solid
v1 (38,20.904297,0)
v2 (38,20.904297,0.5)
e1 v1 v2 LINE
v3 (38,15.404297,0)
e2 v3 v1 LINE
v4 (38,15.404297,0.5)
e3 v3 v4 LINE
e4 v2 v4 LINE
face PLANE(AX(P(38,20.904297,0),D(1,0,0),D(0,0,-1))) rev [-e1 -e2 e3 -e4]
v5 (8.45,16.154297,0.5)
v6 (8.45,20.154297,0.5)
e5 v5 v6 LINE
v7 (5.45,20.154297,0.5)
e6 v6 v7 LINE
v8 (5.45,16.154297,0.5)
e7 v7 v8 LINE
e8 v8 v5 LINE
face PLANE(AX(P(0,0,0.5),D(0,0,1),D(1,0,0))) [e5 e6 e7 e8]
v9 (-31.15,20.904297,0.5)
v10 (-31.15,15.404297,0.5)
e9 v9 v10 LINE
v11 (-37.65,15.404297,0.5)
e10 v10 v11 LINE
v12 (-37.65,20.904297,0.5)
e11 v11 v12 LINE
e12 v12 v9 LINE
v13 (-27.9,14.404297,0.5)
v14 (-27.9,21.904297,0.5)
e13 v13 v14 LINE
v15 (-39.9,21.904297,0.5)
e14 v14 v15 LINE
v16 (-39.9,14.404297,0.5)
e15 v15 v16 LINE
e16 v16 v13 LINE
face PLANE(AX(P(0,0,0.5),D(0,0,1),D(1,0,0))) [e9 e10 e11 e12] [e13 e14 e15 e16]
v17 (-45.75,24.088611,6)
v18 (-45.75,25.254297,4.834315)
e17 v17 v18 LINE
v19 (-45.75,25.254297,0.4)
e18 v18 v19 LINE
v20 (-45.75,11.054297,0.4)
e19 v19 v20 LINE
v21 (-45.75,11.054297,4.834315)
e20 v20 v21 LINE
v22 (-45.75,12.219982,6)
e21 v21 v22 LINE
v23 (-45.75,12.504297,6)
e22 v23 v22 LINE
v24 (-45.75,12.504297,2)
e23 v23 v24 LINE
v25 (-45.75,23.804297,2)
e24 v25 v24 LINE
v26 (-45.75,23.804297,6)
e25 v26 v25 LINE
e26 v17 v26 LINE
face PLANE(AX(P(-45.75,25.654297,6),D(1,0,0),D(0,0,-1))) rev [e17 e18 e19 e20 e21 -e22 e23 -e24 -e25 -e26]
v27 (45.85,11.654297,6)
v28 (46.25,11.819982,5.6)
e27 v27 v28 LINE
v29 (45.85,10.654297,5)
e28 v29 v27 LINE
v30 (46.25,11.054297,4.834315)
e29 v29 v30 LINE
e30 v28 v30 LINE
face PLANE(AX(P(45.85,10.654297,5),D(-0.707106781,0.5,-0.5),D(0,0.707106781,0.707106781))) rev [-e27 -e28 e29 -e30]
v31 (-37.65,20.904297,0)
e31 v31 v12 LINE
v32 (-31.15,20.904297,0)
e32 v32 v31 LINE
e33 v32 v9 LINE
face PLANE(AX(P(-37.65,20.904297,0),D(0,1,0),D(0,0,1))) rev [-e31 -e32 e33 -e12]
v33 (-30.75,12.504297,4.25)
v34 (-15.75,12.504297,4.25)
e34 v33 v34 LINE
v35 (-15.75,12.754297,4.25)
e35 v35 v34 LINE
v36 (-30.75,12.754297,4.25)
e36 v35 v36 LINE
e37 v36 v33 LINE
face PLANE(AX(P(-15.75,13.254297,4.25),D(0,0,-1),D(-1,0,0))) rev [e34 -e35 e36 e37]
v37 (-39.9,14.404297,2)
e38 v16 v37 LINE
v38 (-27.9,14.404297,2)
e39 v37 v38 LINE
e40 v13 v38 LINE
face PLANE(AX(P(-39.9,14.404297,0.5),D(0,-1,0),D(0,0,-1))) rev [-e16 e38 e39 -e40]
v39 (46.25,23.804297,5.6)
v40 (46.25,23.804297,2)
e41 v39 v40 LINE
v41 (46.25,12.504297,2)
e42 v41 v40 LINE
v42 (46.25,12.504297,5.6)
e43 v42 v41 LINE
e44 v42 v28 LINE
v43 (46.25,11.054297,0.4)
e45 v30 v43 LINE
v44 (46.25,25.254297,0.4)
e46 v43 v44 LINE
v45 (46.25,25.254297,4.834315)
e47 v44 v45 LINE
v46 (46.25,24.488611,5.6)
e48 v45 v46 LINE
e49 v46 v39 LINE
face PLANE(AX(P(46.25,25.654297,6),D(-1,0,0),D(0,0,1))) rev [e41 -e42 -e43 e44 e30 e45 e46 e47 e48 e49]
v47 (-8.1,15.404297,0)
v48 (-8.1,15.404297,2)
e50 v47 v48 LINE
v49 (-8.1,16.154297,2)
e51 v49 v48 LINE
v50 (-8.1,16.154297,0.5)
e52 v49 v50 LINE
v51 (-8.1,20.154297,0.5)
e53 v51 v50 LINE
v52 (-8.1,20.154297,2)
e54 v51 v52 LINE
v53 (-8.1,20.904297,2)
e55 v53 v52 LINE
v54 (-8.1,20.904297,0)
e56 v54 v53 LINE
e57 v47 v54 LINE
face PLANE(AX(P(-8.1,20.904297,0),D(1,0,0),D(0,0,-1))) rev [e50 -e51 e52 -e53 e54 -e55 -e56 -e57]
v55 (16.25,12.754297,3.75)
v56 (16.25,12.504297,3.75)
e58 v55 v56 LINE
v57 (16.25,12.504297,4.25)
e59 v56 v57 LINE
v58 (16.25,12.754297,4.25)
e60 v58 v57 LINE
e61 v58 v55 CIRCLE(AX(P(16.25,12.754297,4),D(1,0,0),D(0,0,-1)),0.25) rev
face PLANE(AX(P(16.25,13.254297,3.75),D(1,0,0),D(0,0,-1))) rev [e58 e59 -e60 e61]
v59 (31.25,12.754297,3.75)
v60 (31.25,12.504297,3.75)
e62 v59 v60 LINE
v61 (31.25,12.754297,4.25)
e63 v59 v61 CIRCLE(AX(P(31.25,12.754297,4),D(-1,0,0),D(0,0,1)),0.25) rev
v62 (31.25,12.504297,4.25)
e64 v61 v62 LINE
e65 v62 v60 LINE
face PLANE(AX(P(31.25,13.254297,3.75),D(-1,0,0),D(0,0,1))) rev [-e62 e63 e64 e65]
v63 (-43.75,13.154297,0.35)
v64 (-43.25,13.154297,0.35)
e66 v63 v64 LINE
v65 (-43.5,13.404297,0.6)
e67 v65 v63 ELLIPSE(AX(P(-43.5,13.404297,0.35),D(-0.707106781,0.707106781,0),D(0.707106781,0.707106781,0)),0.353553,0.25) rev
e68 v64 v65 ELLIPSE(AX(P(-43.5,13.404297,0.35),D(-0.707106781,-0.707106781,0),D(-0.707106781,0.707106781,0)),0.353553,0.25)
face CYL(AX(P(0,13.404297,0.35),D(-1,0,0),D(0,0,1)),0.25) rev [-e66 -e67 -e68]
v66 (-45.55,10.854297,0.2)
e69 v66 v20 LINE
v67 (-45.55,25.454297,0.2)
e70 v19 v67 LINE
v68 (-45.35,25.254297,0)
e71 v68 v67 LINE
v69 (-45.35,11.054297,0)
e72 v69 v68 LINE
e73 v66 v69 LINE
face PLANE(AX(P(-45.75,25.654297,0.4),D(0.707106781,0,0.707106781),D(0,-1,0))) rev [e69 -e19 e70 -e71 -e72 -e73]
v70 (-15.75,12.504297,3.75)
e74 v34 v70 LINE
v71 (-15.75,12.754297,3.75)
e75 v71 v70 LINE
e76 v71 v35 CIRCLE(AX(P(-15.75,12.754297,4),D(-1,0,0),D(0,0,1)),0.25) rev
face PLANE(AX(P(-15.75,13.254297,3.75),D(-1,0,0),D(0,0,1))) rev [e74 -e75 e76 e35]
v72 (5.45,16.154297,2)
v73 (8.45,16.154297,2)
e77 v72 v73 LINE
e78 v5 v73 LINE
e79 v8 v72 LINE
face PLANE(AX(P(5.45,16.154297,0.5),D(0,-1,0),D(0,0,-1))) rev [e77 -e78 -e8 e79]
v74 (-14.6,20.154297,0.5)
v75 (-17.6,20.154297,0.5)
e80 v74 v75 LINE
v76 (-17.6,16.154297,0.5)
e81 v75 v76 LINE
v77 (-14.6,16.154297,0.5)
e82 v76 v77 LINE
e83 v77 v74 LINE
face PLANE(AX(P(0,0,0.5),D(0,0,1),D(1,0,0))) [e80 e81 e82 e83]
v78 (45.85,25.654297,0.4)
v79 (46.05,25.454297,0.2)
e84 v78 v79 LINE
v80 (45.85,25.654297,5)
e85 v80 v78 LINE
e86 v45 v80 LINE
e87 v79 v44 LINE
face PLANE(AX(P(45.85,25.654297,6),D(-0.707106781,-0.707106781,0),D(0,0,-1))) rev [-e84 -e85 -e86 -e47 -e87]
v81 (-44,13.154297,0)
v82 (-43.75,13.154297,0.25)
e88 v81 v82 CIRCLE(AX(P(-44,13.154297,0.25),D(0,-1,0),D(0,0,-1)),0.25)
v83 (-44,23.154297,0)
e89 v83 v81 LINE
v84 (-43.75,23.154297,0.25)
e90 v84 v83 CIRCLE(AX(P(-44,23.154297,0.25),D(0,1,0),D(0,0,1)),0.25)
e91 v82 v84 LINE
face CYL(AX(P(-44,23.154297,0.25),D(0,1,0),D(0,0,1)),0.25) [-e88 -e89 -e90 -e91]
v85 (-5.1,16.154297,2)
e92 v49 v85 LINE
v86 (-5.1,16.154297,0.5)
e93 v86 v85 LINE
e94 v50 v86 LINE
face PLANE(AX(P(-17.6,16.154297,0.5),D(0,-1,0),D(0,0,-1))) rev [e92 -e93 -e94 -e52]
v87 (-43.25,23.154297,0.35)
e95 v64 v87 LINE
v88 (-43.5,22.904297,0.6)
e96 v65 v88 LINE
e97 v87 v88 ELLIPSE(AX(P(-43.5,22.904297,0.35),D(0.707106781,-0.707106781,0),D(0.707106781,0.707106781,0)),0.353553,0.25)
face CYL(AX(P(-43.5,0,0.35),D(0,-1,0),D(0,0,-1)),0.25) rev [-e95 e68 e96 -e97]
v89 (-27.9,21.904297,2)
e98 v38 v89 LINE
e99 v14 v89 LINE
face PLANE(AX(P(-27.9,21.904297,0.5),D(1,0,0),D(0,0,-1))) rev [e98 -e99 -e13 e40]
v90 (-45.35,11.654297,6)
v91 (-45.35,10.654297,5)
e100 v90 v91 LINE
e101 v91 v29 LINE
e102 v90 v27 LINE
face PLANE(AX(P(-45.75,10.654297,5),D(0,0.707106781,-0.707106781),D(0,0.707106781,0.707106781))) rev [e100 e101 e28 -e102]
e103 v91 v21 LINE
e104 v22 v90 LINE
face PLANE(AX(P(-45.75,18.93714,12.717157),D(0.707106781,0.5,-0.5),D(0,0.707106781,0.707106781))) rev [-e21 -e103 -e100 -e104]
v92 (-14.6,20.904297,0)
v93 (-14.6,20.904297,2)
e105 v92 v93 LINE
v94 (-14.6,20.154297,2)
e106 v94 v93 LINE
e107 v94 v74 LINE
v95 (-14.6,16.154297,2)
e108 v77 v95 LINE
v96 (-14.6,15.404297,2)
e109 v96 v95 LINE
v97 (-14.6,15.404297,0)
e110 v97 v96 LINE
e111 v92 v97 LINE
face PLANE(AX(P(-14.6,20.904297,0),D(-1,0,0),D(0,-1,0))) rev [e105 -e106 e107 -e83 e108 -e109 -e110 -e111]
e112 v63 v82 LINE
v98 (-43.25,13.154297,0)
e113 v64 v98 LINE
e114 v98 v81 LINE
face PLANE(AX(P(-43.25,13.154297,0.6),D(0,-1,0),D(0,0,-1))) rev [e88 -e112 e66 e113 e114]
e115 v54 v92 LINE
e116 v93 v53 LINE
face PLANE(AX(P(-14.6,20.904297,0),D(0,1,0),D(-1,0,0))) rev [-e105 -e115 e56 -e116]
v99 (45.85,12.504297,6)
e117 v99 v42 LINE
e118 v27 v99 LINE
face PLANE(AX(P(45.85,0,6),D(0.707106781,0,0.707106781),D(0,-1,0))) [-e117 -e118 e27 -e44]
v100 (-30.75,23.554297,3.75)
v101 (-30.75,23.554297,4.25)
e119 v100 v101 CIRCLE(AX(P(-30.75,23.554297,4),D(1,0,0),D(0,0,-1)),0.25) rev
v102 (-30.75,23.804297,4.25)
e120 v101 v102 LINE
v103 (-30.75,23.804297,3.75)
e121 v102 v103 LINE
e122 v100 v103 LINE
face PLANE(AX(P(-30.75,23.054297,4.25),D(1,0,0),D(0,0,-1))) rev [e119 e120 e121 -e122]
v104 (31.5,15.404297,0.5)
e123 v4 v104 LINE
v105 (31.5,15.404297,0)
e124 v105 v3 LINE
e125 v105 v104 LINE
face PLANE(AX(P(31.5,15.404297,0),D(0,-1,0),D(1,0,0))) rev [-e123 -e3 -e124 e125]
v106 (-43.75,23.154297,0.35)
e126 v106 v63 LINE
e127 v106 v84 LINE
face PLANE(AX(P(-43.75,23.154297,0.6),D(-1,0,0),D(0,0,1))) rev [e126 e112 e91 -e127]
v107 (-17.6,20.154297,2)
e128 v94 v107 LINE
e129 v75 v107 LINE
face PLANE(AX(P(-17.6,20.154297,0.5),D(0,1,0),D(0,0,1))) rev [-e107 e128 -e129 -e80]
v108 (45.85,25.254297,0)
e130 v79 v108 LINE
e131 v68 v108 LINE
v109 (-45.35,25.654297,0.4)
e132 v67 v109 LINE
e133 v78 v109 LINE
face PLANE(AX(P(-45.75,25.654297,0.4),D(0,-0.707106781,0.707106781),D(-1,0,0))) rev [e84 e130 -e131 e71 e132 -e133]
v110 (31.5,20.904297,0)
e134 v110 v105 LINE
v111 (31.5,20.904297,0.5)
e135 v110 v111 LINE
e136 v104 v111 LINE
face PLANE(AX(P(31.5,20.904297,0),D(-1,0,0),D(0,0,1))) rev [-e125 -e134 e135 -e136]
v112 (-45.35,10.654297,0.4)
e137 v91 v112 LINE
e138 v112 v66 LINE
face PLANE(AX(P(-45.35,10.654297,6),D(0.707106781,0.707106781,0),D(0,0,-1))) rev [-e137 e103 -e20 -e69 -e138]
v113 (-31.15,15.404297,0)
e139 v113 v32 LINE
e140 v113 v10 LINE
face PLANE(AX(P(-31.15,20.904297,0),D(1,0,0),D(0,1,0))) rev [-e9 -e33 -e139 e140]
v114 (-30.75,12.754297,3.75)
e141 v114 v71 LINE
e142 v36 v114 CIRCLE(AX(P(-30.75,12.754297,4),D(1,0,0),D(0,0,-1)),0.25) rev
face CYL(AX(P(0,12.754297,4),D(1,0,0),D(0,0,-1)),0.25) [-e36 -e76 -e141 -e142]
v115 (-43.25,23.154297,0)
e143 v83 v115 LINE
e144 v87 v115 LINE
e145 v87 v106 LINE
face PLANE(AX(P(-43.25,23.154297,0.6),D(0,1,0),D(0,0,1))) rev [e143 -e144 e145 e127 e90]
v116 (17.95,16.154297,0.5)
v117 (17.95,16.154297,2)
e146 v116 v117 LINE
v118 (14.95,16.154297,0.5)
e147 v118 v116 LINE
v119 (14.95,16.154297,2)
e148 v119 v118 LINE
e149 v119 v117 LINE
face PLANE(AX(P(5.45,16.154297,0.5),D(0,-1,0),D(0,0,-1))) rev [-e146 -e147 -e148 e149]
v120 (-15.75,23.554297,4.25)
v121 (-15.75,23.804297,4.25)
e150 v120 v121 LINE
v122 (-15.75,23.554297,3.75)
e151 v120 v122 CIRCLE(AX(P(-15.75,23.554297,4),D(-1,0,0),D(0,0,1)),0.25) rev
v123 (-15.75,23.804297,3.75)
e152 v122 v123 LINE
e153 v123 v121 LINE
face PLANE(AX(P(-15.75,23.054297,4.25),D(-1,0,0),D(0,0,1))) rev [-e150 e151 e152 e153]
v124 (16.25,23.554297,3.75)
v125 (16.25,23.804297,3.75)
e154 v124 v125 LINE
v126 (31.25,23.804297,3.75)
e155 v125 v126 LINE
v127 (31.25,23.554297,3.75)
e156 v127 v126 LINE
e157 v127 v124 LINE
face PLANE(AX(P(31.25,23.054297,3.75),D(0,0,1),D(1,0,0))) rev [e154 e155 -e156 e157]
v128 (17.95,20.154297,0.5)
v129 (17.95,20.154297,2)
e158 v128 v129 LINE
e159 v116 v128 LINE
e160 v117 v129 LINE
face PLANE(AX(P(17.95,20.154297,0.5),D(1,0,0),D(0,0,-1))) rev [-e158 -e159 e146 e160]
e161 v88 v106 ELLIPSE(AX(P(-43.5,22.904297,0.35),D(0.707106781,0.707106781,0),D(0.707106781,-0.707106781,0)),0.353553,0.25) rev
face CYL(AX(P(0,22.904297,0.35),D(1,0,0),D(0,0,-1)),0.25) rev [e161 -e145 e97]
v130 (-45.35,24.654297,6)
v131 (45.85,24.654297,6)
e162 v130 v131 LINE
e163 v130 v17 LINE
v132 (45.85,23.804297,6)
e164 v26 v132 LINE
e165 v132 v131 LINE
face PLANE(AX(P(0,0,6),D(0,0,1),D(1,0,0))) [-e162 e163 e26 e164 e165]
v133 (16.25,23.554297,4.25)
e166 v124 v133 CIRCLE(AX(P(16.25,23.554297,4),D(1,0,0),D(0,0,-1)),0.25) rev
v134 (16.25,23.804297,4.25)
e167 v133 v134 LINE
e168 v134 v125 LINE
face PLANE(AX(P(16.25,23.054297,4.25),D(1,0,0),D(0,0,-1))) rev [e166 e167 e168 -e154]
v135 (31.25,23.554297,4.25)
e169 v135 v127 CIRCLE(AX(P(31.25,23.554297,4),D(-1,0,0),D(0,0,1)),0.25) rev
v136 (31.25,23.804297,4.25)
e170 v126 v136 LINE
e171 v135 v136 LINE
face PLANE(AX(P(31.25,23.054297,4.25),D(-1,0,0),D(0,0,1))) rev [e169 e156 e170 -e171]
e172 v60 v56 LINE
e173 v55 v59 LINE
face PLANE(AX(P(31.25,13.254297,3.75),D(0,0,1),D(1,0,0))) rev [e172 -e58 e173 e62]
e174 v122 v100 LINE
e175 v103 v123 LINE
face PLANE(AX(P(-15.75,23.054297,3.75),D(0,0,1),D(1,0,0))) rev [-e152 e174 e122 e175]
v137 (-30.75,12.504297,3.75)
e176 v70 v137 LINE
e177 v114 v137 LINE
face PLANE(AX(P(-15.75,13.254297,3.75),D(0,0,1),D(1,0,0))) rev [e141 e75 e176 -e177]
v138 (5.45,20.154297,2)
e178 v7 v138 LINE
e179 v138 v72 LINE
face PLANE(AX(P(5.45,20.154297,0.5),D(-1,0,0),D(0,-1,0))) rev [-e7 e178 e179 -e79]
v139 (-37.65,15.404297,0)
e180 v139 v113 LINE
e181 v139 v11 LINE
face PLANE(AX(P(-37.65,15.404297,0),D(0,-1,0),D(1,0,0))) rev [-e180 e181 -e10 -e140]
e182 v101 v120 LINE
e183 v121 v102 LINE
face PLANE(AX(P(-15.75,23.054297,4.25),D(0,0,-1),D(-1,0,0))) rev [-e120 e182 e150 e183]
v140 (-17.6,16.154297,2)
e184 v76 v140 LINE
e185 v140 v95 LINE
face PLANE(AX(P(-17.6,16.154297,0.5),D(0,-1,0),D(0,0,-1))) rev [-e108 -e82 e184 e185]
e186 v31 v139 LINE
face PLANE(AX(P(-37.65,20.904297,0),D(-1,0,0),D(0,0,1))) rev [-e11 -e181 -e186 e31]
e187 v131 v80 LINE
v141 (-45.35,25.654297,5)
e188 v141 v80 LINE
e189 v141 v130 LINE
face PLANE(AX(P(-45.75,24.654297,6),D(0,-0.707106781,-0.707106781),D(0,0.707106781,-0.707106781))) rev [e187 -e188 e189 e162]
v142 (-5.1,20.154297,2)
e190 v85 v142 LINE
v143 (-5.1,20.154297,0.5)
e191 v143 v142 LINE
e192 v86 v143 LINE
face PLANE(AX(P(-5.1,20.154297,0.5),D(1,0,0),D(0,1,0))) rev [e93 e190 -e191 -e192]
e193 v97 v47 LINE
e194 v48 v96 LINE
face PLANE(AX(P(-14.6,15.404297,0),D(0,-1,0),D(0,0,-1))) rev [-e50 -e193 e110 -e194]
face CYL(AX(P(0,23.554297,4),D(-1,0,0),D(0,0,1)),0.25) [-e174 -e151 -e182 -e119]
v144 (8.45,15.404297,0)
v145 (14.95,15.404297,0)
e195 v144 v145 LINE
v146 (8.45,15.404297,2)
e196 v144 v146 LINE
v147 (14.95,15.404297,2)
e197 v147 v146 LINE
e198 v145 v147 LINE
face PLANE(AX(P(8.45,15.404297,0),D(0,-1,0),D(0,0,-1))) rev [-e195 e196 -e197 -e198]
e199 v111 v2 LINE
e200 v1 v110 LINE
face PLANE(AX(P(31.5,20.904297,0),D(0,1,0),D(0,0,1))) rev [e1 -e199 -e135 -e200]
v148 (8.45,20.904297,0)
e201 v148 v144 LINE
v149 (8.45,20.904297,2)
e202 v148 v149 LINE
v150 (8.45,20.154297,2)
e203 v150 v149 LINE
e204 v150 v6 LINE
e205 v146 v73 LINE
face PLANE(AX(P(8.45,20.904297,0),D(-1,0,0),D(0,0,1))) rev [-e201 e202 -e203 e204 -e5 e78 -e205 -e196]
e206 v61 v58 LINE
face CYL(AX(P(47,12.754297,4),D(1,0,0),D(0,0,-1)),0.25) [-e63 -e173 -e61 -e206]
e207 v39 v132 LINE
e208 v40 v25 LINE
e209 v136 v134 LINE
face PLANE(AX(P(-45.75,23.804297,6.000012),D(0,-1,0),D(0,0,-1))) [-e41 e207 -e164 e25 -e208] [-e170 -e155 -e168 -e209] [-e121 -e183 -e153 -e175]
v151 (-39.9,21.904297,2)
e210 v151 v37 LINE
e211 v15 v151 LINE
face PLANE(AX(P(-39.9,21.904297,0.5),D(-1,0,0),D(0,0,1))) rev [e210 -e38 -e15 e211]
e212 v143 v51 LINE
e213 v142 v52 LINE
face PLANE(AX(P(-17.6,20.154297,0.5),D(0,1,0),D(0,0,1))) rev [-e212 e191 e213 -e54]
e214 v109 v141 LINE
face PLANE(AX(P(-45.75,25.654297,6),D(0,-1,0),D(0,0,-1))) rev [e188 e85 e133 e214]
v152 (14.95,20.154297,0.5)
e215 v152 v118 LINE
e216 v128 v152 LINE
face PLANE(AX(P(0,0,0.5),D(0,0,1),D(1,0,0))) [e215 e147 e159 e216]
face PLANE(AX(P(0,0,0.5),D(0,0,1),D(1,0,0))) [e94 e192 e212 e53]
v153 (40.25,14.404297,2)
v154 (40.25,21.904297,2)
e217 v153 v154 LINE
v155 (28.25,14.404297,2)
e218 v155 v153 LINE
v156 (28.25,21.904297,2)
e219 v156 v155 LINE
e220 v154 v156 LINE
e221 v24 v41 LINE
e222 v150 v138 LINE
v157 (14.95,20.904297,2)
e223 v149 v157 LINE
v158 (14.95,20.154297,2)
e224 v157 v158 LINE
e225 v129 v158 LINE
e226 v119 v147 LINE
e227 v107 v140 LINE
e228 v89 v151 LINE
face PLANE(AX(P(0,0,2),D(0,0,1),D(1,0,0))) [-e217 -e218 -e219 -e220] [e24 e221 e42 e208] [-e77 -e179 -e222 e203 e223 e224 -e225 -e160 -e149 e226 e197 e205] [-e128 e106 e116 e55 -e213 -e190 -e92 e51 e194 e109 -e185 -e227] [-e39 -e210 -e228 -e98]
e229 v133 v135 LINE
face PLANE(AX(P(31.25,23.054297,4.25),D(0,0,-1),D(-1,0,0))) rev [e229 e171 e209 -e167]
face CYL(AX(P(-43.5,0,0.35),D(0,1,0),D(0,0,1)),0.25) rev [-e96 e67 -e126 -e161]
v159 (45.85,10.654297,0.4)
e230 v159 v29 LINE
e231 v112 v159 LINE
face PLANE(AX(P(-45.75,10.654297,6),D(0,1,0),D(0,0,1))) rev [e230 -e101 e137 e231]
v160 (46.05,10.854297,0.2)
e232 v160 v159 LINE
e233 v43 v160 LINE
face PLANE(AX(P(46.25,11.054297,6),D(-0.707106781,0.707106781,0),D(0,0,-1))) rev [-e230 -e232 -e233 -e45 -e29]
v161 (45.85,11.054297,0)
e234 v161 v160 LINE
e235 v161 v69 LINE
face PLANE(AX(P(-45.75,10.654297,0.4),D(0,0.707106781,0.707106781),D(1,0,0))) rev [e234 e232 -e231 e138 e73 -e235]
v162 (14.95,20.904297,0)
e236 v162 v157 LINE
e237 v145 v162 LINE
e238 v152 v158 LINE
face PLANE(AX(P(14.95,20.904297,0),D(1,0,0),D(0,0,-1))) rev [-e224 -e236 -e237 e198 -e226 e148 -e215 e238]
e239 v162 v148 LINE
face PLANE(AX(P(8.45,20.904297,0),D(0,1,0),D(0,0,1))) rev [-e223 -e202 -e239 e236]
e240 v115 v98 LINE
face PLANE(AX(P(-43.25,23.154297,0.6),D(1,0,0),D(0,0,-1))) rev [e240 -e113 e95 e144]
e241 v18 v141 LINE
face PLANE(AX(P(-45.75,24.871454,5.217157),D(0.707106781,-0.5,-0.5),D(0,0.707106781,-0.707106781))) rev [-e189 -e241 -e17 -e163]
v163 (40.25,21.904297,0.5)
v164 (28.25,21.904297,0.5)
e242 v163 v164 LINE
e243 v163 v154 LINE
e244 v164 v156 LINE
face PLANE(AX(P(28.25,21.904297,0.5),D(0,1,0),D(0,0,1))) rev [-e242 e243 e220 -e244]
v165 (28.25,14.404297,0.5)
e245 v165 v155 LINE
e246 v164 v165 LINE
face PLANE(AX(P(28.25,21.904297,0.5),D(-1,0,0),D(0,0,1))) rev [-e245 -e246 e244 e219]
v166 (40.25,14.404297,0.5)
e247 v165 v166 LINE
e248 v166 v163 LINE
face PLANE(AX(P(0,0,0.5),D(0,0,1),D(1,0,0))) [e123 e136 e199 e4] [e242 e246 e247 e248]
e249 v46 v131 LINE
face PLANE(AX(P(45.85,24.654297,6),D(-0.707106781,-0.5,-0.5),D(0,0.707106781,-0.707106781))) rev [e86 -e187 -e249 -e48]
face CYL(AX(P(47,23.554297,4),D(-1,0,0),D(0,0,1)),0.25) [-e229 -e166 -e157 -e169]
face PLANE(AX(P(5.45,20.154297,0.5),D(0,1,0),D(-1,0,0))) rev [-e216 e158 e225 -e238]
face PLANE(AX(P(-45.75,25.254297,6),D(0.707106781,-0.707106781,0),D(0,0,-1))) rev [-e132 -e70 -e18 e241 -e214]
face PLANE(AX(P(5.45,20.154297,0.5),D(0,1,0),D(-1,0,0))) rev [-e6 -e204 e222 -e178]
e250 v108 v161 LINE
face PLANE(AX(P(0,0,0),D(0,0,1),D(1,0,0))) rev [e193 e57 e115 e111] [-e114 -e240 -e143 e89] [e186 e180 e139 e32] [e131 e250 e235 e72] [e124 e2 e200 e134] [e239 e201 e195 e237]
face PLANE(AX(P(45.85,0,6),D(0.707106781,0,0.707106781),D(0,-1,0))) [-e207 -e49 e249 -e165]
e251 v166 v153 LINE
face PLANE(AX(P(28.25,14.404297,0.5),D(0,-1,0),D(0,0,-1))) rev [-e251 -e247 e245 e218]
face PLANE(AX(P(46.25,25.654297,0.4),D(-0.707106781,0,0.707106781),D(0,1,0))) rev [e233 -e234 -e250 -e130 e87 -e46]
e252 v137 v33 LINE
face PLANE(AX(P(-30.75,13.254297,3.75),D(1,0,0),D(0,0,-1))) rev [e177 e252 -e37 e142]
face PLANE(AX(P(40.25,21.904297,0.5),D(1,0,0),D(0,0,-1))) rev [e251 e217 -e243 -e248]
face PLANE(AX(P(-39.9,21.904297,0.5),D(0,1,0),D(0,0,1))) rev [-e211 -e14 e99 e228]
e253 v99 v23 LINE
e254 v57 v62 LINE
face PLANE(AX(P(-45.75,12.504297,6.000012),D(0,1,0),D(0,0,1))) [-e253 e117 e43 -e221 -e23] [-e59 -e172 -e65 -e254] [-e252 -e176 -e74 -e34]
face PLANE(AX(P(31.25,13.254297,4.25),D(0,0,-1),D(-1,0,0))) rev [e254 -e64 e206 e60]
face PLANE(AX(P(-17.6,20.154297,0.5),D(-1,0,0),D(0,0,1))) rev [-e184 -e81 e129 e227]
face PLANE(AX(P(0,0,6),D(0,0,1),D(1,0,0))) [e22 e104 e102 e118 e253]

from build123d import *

# Parameters (mm, degrees)
SKETCH1_W               = 92
SKETCH1_H               = 15
BOSS_EXTRUDE1_DEPTH     = 6
CUT_EXTRUDE1_DEPTH      = 54.227863457
CUT_EXTRUDE1_DEPTH_BACK = 54.227863457
SKETCH2_W               = 6.5
SKETCH2_H               = 5.5
CUT_EXTRUDE2_DEPTH      = 54.227863457
CUT_EXTRUDE2_DEPTH_BACK = 54.227863457
SKETCH3_W               = 6.5
SKETCH3_H               = 5.5
CUT_EXTRUDE3_DEPTH      = 54.227863457
CUT_EXTRUDE3_DEPTH_BACK = 54.227863457
SKETCH4_W               = 6.5
SKETCH4_H               = 5.5
CUT_EXTRUDE4_DEPTH      = 54.227863457
CUT_EXTRUDE4_DEPTH_BACK = 54.227863457
SKETCH5_W               = 6.5
SKETCH5_H               = 5.5
CUT_EXTRUDE5_DEPTH      = 54.227863457
CUT_EXTRUDE5_DEPTH_BACK = 4
SKETCH8_W               = 92
SKETCH8_H               = 11.3
SKETCH9_W               = 12
SKETCH9_H               = 7.5
CUT_EXTRUDE6_DEPTH      = 1.5
SKETCH10_W              = 12.5
SKETCH10_H              = 4
CUT_EXTRUDE7_DEPTH      = 1.5
CUT_EXTRUDE8_DEPTH      = 92
SKETCH13_W              = 0.5
SKETCH13_H              = 10
CUT_EXTRUDE9_DEPTH      = 0.6
FILLET1_R               = 0.25
FILLET2_R               = 0.25
SKETCH16_W              = 15
SKETCH16_H              = 0.5
BOSS_EXTRUDE2_DEPTH     = 0.75
FILLET3_R               = 0.5
FILLET4_R               = 0.25
SKETCH17_W              = 15
SKETCH17_H              = 0.5
BOSS_EXTRUDE3_DEPTH     = 0.75
FILLET5_R               = 0.5
FILLET6_R               = 0.25
LPATTERN1_COUNT         = 2
LPATTERN1_PITCH         = 47
LPATTERN2_COUNT         = 2
LPATTERN2_PITCH         = 47
FILLET7_R               = 0.5
FILLET8_R               = 0.25
FILLET9_R               = 0.5
FILLET10_R              = 0.25
CHAMFER1_SIZE           = 0.4
CHAMFER2_SIZE           = 0.4
CHAMFER3_SIZE           = 0.4
CHAMFER4_SIZE           = 0.4
CHAMFER5_SIZE           = 0.4


# Some blends are built 0.0001 mm under size
with BuildPart() as part:
    # Sketch1 → Boss-Extrude1 (new body)
    with BuildSketch(Plane.XY):
        with Locations((0.25, 18.154296875)):
            Rectangle(SKETCH1_W, SKETCH1_H)
    extrude(amount=BOSS_EXTRUDE1_DEPTH)

    # Sketch2 → Cut-Extrude1 (cut, two sides: drawn at the far end of the back side and taken through both)
    with BuildSketch(Plane.XY.offset(6).offset(-CUT_EXTRUDE1_DEPTH_BACK)):
        with Locations((-34.4, 18.154296875)):
            Rectangle(SKETCH2_W, SKETCH2_H)
    extrude(amount=CUT_EXTRUDE1_DEPTH + CUT_EXTRUDE1_DEPTH_BACK, mode=Mode.SUBTRACT)

    # Sketch3 → Cut-Extrude2 (cut, two sides: drawn at the far end of the back side and taken through both)
    with BuildSketch(Plane.XY.offset(6).offset(-CUT_EXTRUDE2_DEPTH_BACK)):
        with Locations((-11.35, 18.154296875)):
            Rectangle(SKETCH3_W, SKETCH3_H)
    extrude(amount=CUT_EXTRUDE2_DEPTH + CUT_EXTRUDE2_DEPTH_BACK, mode=Mode.SUBTRACT)

    # Sketch4 → Cut-Extrude3 (cut, two sides: drawn at the far end of the back side and taken through both)
    with BuildSketch(Plane.XY.offset(6).offset(-CUT_EXTRUDE3_DEPTH_BACK)):
        with Locations((11.7, 18.154296875)):
            Rectangle(SKETCH4_W, SKETCH4_H)
    extrude(amount=CUT_EXTRUDE3_DEPTH + CUT_EXTRUDE3_DEPTH_BACK, mode=Mode.SUBTRACT)

    # Sketch5 → Cut-Extrude4 (cut, two sides: drawn at the far end of the back side and taken through both)
    with BuildSketch(Plane.XY.offset(6).offset(-CUT_EXTRUDE4_DEPTH_BACK)):
        with Locations((34.75, 18.154296875)):
            Rectangle(SKETCH5_W, SKETCH5_H)
    extrude(amount=CUT_EXTRUDE4_DEPTH + CUT_EXTRUDE4_DEPTH_BACK, mode=Mode.SUBTRACT)

    # Sketch8 → Cut-Extrude5 (cut, two sides: drawn at the far end of the back side and taken through both)
    with BuildSketch(Plane.XY.offset(6).offset(-CUT_EXTRUDE5_DEPTH_BACK)):
        with Locations((0.25, 18.154296875)):
            Rectangle(SKETCH8_W, SKETCH8_H)
    extrude(amount=CUT_EXTRUDE5_DEPTH + CUT_EXTRUDE5_DEPTH_BACK, mode=Mode.SUBTRACT)

    # Sketch9 → Cut-Extrude6 (cut)
    with BuildSketch(Plane.XY.offset(2)):
        with Locations((34.25, 18.154296875)):
            Rectangle(SKETCH9_W, SKETCH9_H)
        with Locations((-33.9, 18.154296875)):
            Rectangle(SKETCH9_W, SKETCH9_H)
    extrude(amount=-CUT_EXTRUDE6_DEPTH, mode=Mode.SUBTRACT)

    # Sketch10 → Cut-Extrude7 (cut)
    with BuildSketch(Plane.XY.offset(2)):
        with Locations((11.7, 18.154296875)):
            Rectangle(SKETCH10_W, SKETCH10_H)
        with Locations((-11.35, 18.154296875)):
            Rectangle(SKETCH10_W, SKETCH10_H)
    extrude(amount=-CUT_EXTRUDE7_DEPTH, mode=Mode.SUBTRACT)

    # Sketch12 → Cut-Extrude8 (cut)
    with BuildSketch(Plane(origin=(46.25, 0, 0), x_dir=(0, 0, -1), z_dir=(1, 0, 0))):
        Polygon((-6, 25.654296875), (-6, 24.654296875), (-5, 25.654296875), align=None)
        Polygon((-6, 10.654296875), (-5, 10.654296875), (-6, 11.654296875), align=None)
    extrude(amount=-CUT_EXTRUDE8_DEPTH, mode=Mode.SUBTRACT)

    # Sketch13 → Cut-Extrude9 (cut)
    with BuildSketch(Plane(origin=(0, 0, 0), x_dir=(-1, 0, 0), z_dir=(0, 0, -1))):
        with Locations((43.5, 18.154296875)):
            Rectangle(SKETCH13_W, SKETCH13_H)
    extrude(amount=-CUT_EXTRUDE9_DEPTH, mode=Mode.SUBTRACT)

    # Fillet1
    fillet1_edges = [part.edges().sort_by_distance(p)[0] for p in [
        (-43.75, 18.154296875, 0),
    ]]
    fillet(fillet1_edges, radius=FILLET1_R)

    # Fillet2
    fillet2_edges = [part.edges().sort_by_distance(p)[0] for p in [
        (-43.25, 18.154296875, 0.6),
        (-43.5, 23.154296875, 0.6),
        (-43.75, 18.154296875, 0.6),
        (-43.5, 13.154296875, 0.6),
    ]]
    fillet(fillet2_edges, radius=FILLET2_R - 0.0001)  # a hair under: the kernel refuses the full size

    # Sketch16 → Boss-Extrude2 (add)
    with BuildSketch(Plane.XZ.offset(-23.804296875)):
        with Locations((-23.25, 4)):
            Rectangle(SKETCH16_W, SKETCH16_H)
    boss_extrude2 = extrude(amount=BOSS_EXTRUDE2_DEPTH)

    # Fillet3
    fillet3_edges = [part.edges().sort_by_distance(p)[0] for p in [
        (-23.25, 23.054296875, 4.25),
    ]]
    fillet(fillet3_edges, radius=FILLET3_R - 0.0001)  # a hair under: the kernel refuses the full size

    # Fillet4
    # the kernel refuses this fillet: 0.25 mm, written as the material it takes off along each edge
    with BuildSketch(Plane(origin=(-32.517583767, 23.054296875, 3.75), x_dir=(0, 0.707033489959235, 0.7071800648180521), z_dir=(1, 0, 0))) as fillet4_piece_1:
        with BuildLine():
            CenterArc((0.530239774, -0.176759657), FILLET4_R, 44.994478066, 179.999583566)
            Line((0.353444757, -0.35351803), (0.335765256, -0.371193867))
            Line((0.335765256, -0.371193867), (-0.017679502, -0.017675837))
            Line((-0.017679502, -0.017675837), (-0.017675837, 0.017679502))
            ThreePointArc((-0.017675837, 0.017679502), (-0.017605119, 0.017750205), (0.724712878, 0.017675966))
            Line((0.724712878, 0.017675966), (0.707033505, 0))
        make_face()
    extrude(amount=18.535167534, mode=Mode.SUBTRACT)

    # Sketch17 → Boss-Extrude3 (add)
    with BuildSketch(Plane(origin=(0, 12.504296875, 0), x_dir=(1, 0, 0), z_dir=(0, 1, 0))):
        with Locations((-23.25, -4)):
            Rectangle(SKETCH17_W, SKETCH17_H)
    boss_extrude3 = extrude(amount=BOSS_EXTRUDE3_DEPTH)

    # Fillet5
    fillet5_edges = [part.edges().sort_by_distance(p)[0] for p in [
        (-23.25, 13.254296875, 4.25),
    ]]
    fillet(fillet5_edges, radius=FILLET5_R - 0.0001)  # a hair under: the kernel refuses the full size

    # Fillet6
    # the kernel refuses this fillet: 0.25 mm, written as the material it takes off along each edge
    with BuildSketch(Plane(origin=(-13.982416233, 13.254296875, 3.75), x_dir=(0, -0.7070334915471351, 0.7071800632304811), z_dir=(-1, 0, 0))) as fillet6_piece_1:
        with BuildLine():
            CenterArc((0.530239775, -0.176759657), FILLET6_R, 44.994477938, 179.999583823)
            Line((0.353444759, -0.35351803), (0.335765257, -0.371193867))
            Line((0.335765257, -0.371193867), (-0.017679502, -0.017675837))
            Line((-0.017679502, -0.017675837), (-0.017675837, 0.017679502))
            ThreePointArc((-0.017675837, 0.017679502), (-0.017605119, 0.017750205), (0.72471288, 0.017675966))
            Line((0.72471288, 0.017675966), (0.707033507, 0))
        make_face()
    extrude(amount=18.535167534, mode=Mode.SUBTRACT)

    # LPattern1: Boss-Extrude3 ×2
    with Locations(*[(i * LPATTERN1_PITCH, 0, 0) for i in range(1, LPATTERN1_COUNT)]):
        add(boss_extrude3)

    # LPattern2: Boss-Extrude2 ×2
    with Locations(*[(i * LPATTERN2_PITCH, 0, 0) for i in range(1, LPATTERN2_COUNT)]):
        add(boss_extrude2)

    # Fillet7
    fillet7_edges = [part.edges().sort_by_distance(p)[0] for p in [
        (23.75, 23.054296875, 4.25),
    ]]
    fillet(fillet7_edges, radius=FILLET7_R - 0.0001)  # a hair under: the kernel refuses the full size

    # Fillet8
    # the kernel refuses this fillet: 0.25 mm, written as the material it takes off along each edge
    with BuildSketch(Plane(origin=(14.482416233, 23.054296875, 3.75), x_dir=(0, 0.707033489959235, 0.7071800648180521), z_dir=(1, 0, 0))) as fillet8_piece_1:
        with BuildLine():
            CenterArc((0.530239774, -0.176759657), FILLET8_R, 44.994478066, 179.999583566)
            Line((0.353444757, -0.35351803), (0.335765256, -0.371193867))
            Line((0.335765256, -0.371193867), (-0.017679502, -0.017675837))
            Line((-0.017679502, -0.017675837), (-0.017675837, 0.017679502))
            ThreePointArc((-0.017675837, 0.017679502), (-0.017605119, 0.017750205), (0.724712878, 0.017675966))
            Line((0.724712878, 0.017675966), (0.707033505, 0))
        make_face()
    extrude(amount=18.535167534, mode=Mode.SUBTRACT)

    # Fillet9
    fillet9_edges = [part.edges().sort_by_distance(p)[0] for p in [
        (23.75, 13.254296875, 4.25),
    ]]
    fillet(fillet9_edges, radius=FILLET9_R - 0.0001)  # a hair under: the kernel refuses the full size

    # Fillet10
    # the kernel refuses this fillet: 0.25 mm, written as the material it takes off along each edge
    with BuildSketch(Plane(origin=(33.017583767, 13.254296875, 3.75), x_dir=(0, -0.7070334947010828, 0.707180060077187), z_dir=(-1, 0, 0))) as fillet10_piece_1:
        with BuildLine():
            CenterArc((0.530239777, -0.176759656), FILLET10_R, 44.994477682, 179.999584334)
            Line((0.353444762, -0.35351803), (0.335765261, -0.371193867))
            Line((0.335765261, -0.371193867), (-0.017679502, -0.017675837))
            Line((-0.017679502, -0.017675837), (-0.017675837, 0.017679502))
            ThreePointArc((-0.017675837, 0.017679502), (-0.017605119, 0.017750205), (0.724712883, 0.017675966))
            Line((0.724712883, 0.017675966), (0.70703351, 0))
        make_face()
    extrude(amount=18.535167534, mode=Mode.SUBTRACT)

    # Chamfer1
    chamfer1_edges = [part.edges().sort_by_distance(p)[0] for p in [
        (0.25, 25.654296875, 0),
        (0.25, 10.654296875, 0),
    ]]
    chamfer(chamfer1_edges, length=CHAMFER1_SIZE)

    # Chamfer2
    chamfer2_edges = [part.edges().sort_by_distance(p)[0] for p in [
        (46.25, 18.154296875, 0),
        (-45.75, 18.154296875, 0),
    ]]
    chamfer(chamfer2_edges, length=CHAMFER2_SIZE)

    # Chamfer3
    chamfer3_edges = [part.edges().sort_by_distance(p)[0] for p in [
        (-45.75, 25.654296875, 2.7),
        (-45.75, 10.654296875, 2.7),
    ]]
    chamfer(chamfer3_edges, length=CHAMFER3_SIZE)

    # Chamfer4
    chamfer4_edges = [part.edges().sort_by_distance(p)[0] for p in [
        (-45.75, 11.354296875, 5.7),
        (-45.75, 24.954296875, 5.7),
    ]]
    chamfer(chamfer4_edges, length=CHAMFER4_SIZE)

    # Chamfer5
    chamfer5_edges = [part.edges().sort_by_distance(p)[0] for p in [
        (46.25, 24.229296875, 6),
        (46.25, 25.654296875, 2.7),
        (46.25, 10.654296875, 2.7),
        (46.25, 12.079296875, 6),
        (46.25, 25.154296875, 5.5),
        (46.25, 11.154296875, 5.5),
    ]]
    chamfer(chamfer5_edges, length=CHAMFER5_SIZE)


solid = part.part
